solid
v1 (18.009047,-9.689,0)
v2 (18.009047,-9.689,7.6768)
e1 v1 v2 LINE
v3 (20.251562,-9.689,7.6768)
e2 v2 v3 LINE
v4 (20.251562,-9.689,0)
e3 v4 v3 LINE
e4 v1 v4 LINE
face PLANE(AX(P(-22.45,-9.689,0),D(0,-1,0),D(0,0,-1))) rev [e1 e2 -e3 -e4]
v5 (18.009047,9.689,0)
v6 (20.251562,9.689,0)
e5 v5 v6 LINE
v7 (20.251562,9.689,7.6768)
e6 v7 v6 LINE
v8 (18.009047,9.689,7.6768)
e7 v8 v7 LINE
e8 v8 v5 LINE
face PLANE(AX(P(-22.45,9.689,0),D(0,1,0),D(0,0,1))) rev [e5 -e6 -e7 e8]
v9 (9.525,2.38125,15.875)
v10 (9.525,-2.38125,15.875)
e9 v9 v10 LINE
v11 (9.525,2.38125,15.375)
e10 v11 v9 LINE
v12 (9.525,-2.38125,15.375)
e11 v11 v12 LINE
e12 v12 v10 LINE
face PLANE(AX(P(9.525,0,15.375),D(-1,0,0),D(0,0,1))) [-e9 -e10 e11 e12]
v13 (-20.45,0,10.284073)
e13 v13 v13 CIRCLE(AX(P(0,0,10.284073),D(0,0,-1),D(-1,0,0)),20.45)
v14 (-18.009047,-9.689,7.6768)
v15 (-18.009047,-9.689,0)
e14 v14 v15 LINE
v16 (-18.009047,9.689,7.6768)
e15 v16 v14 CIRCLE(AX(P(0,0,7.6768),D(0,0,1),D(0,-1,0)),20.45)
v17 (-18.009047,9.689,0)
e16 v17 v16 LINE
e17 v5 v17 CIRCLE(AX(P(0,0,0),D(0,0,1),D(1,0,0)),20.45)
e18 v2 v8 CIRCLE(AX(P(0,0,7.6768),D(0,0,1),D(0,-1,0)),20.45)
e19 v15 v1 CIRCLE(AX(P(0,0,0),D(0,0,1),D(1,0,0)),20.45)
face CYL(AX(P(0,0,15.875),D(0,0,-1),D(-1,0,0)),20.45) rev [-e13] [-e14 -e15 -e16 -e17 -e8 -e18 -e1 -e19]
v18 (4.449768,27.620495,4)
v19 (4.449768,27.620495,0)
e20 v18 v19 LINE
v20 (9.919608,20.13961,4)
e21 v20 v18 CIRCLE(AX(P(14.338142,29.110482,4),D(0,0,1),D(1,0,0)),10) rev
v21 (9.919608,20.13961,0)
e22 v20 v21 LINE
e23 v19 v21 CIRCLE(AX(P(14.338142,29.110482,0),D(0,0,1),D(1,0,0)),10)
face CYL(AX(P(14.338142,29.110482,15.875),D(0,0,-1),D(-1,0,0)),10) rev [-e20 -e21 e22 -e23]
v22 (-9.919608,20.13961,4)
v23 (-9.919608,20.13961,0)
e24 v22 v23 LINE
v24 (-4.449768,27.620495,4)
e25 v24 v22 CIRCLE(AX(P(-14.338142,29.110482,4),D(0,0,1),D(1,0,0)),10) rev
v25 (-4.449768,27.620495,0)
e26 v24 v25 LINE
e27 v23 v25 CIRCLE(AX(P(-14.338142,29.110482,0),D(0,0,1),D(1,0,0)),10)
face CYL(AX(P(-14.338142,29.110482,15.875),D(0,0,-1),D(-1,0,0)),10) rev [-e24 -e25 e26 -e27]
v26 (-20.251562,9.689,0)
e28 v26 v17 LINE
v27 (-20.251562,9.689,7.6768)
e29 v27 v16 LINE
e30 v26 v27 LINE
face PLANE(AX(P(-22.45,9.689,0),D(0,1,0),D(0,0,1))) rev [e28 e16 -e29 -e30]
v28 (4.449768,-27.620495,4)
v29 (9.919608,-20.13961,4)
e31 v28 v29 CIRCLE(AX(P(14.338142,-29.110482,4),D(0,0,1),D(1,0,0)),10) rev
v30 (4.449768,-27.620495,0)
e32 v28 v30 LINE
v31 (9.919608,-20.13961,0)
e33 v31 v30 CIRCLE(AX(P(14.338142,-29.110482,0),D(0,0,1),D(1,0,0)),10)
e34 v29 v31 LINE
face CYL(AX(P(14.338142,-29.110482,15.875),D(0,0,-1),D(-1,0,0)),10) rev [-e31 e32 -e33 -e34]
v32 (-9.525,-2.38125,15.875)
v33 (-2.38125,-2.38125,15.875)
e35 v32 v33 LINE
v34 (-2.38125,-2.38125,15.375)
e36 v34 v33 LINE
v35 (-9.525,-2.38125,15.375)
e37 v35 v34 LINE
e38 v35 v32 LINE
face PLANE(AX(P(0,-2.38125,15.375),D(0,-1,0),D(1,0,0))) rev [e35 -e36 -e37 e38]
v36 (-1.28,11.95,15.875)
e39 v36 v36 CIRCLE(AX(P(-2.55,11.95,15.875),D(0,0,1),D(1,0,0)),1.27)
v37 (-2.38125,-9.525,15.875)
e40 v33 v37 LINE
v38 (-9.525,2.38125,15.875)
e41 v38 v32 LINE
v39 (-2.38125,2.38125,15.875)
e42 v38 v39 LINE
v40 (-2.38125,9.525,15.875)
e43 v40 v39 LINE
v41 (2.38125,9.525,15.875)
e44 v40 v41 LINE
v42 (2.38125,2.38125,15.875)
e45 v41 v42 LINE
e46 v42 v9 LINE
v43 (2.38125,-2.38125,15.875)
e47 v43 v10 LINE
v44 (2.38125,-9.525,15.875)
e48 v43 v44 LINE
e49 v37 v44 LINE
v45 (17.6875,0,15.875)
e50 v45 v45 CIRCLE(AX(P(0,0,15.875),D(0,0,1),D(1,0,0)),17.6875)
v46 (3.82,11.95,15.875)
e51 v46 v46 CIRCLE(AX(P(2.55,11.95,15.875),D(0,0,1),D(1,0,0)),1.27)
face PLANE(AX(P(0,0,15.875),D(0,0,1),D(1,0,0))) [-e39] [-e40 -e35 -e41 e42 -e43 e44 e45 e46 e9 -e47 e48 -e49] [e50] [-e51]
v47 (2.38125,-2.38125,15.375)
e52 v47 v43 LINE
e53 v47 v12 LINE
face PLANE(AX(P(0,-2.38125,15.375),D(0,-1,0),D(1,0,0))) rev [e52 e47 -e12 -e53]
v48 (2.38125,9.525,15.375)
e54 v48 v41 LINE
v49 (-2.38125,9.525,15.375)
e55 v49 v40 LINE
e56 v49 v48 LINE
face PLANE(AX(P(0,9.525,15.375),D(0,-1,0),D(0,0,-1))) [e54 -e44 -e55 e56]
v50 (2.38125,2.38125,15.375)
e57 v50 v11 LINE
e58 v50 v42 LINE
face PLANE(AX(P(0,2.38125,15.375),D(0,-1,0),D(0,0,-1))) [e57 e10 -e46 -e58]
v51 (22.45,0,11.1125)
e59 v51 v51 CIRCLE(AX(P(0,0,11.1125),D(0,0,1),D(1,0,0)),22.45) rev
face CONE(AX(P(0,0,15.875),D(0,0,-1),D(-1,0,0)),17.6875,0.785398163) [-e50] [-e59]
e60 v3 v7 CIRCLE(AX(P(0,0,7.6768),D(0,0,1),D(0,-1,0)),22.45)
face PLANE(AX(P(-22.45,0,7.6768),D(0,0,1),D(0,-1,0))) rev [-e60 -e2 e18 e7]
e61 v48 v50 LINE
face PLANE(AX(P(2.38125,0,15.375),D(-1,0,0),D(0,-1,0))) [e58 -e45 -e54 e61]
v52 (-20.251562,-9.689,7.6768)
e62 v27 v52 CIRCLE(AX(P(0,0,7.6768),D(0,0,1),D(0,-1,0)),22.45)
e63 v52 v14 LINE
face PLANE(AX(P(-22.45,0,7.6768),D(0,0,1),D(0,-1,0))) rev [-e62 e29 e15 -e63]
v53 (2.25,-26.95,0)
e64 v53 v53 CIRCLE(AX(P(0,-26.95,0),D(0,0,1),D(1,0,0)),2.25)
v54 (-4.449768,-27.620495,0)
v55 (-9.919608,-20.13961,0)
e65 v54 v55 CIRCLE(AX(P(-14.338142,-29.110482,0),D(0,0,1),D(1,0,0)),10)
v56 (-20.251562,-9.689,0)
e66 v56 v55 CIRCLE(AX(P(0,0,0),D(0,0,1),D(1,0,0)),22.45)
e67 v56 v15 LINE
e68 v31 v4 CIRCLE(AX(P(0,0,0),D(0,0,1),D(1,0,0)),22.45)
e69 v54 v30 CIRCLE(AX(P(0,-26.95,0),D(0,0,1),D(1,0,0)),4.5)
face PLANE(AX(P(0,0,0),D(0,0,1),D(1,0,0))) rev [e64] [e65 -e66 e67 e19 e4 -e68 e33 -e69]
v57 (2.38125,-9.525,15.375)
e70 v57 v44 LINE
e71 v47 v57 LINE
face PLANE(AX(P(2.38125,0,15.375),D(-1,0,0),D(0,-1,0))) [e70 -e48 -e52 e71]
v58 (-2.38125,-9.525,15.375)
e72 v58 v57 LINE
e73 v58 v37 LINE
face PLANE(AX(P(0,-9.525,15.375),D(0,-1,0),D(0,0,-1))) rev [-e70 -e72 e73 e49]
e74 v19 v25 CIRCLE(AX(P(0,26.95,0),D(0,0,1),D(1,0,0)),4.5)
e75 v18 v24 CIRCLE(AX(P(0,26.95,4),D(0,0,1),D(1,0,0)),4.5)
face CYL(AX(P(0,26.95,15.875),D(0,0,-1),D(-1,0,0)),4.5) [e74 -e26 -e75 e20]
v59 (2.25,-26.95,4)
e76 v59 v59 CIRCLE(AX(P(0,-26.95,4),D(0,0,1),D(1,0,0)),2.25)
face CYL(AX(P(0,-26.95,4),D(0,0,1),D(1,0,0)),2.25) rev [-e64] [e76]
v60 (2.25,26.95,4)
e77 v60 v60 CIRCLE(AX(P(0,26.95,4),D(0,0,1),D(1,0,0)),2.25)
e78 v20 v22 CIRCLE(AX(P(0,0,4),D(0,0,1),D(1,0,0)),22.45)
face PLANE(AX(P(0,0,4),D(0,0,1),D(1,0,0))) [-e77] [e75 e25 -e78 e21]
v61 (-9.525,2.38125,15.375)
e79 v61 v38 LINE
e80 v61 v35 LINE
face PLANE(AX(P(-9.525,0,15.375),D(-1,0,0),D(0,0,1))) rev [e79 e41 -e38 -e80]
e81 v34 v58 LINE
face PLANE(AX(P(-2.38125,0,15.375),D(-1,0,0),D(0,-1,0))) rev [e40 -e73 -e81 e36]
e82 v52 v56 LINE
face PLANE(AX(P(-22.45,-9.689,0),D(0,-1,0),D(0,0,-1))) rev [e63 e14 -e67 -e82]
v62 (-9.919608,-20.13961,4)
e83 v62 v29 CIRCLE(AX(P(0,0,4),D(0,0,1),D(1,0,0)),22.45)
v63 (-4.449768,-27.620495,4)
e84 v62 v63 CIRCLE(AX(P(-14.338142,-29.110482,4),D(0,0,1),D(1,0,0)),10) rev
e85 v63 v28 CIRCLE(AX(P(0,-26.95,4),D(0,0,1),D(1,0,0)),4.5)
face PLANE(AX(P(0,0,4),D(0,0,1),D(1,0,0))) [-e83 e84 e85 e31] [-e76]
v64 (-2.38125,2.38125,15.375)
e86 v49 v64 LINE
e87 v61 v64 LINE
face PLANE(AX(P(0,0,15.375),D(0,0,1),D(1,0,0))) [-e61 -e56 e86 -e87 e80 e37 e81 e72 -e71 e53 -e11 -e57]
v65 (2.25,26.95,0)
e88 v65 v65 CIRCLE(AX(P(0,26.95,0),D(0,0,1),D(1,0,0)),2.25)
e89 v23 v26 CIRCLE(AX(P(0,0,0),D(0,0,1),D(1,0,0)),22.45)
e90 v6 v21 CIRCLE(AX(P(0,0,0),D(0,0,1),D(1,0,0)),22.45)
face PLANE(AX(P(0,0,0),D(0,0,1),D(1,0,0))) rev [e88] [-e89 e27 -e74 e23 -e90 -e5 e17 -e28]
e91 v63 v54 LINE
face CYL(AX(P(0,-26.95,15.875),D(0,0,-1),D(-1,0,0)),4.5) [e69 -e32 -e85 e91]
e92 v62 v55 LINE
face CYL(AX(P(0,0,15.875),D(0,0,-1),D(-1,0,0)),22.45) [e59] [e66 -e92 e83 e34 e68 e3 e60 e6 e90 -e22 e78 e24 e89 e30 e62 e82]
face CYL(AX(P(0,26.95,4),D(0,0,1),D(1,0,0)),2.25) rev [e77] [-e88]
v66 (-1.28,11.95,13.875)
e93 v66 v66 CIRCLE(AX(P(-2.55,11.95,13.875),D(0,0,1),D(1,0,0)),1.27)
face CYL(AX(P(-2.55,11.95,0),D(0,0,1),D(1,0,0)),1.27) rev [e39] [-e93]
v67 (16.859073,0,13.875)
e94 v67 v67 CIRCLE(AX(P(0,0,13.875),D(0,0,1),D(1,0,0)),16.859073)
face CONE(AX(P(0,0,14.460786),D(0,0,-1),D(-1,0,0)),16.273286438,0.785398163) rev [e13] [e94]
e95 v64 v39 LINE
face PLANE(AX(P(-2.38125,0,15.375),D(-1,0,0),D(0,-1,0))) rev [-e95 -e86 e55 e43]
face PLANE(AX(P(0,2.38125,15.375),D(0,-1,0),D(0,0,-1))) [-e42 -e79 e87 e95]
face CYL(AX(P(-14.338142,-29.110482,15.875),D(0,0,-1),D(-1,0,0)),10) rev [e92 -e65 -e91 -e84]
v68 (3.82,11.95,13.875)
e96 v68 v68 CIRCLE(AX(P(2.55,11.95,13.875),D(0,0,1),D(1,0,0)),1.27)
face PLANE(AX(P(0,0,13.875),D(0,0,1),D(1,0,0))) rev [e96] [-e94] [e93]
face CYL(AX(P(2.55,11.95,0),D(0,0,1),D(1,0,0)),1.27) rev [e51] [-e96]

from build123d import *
from build123d.topology import SkipClean

# Parameters (mm, degrees)
BOSS_EXTRUDE1_DEPTH     = 15.875
CUT_EXTRUDE2_START      = -11.875
CUT_EXTRUDE2_DEPTH      = 11.875
M4_CLEARANCE_HOLE1_D    = 4.5
CHAMFER1_SIZE           = 4.7625
SHELL1_OUTLINE_R        = 20.45
SHELL1_DEPTH            = 10.284072775
SHELL1_2_DEPTH          = 2
BOSS_EXTRUDE2_START     = 2
BOSS_EXTRUDE2_DEPTH     = 2
SKETCH7_W               = 7.14375
SKETCH7_H               = 4.7625
SKETCH7_W_2             = 4.7625
SKETCH7_H_2             = 7.14375
CUT_EXTRUDE5_DEPTH      = 0.5
CUT_EXTRUDE7_DEPTH      = 42.774640932
CUT_EXTRUDE7_DEPTH_BACK = 42.774640932
SKETCH9_W               = 6.175
SKETCH9_H               = 19.378
SKETCH9_W_2             = 3.175
SKETCH9_H_2             = 16.378
SKETCH9_W_3             = 1.5018
SKETCH12_R              = 1.27
CUT_EXTRUDE10_DEPTH     = 42.774640932


with BuildPart() as part:
    # Sketch1 → Boss-Extrude1 (new body)
    with BuildSketch(Plane.XY):
        with BuildLine():
            ThreePointArc((-9.919608253, 20.139609532), (-22.45, 0), (-9.919608253, -20.139609532))
            ThreePointArc((-9.919608253, -20.139609532), (-6.265793461, -23.208178662), (-4.449768206, -27.62049453))
            ThreePointArc((-4.449768206, -27.62049453), (0, -31.45), (4.449768206, -27.62049453))
            ThreePointArc((4.449768206, -27.62049453), (6.265793461, -23.208178662), (9.919608253, -20.139609532))
            ThreePointArc((9.919608253, -20.139609532), (22.45, 0), (9.919608253, 20.139609532))
            ThreePointArc((9.919608253, 20.139609532), (6.265793461, 23.208178662), (4.449768206, 27.62049453))
            ThreePointArc((4.449768206, 27.62049453), (0, 31.45), (-4.449768206, 27.62049453))
            ThreePointArc((-4.449768206, 27.62049453), (-6.265793461, 23.208178662), (-9.919608253, 20.139609532))
        make_face()
    extrude(amount=BOSS_EXTRUDE1_DEPTH)

    # Sketch3 → Cut-Extrude2 (cut)
    with SkipClean():  # the faces are left unmerged after this step: merging them gives an invalid solid
        with BuildSketch(Plane.XY.offset(15.875).offset(CUT_EXTRUDE2_START)):
            with BuildLine():
                ThreePointArc((-4.449768206, 27.62049453), (-6.265793461, 23.208178662), (-9.919608253, 20.139609532))
                ThreePointArc((-9.919608253, 20.139609532), (0, 22.45), (9.919608253, 20.139609532))
                ThreePointArc((9.919608253, 20.139609532), (6.265793461, 23.208178662), (4.449768206, 27.62049453))
                ThreePointArc((4.449768206, 27.62049453), (0, 31.45), (-4.449768206, 27.62049453))
            make_face()
            with BuildLine():
                ThreePointArc((9.919608253, -20.139609532), (0, -22.45), (-9.919608253, -20.139609532))
                ThreePointArc((-9.919608253, -20.139609532), (-6.265793461, -23.208178662), (-4.449768206, -27.62049453))
                ThreePointArc((-4.449768206, -27.62049453), (0, -31.45), (4.449768206, -27.62049453))
                ThreePointArc((4.449768206, -27.62049453), (6.265793461, -23.208178662), (9.919608253, -20.139609532))
            make_face()
        extrude(amount=CUT_EXTRUDE2_DEPTH, mode=Mode.SUBTRACT)

    # M4 Clearance Hole1 (through all)
    with Locations(Plane.XY.offset(4)):
        with Locations((0, -26.95), (0, 26.95)):
            Hole(M4_CLEARANCE_HOLE1_D / 2)

    # Chamfer1
    chamfer1_edges = [part.edges().sort_by_distance(p)[0] for p in [
        (22.45, 0, 15.875),
    ]]
    chamfer(chamfer1_edges, length=CHAMFER1_SIZE)

    # Shell1: read off the stored shape, not the designer's step
    # Shell1 outline → Shell1 (cut)
    with SkipClean():  # the faces are left unmerged after this step: merging them gives an invalid solid
        with BuildSketch(Plane.XY):
            Circle(SHELL1_OUTLINE_R)
        extrude(amount=SHELL1_DEPTH, mode=Mode.SUBTRACT)

    # Shell1 2 outline → Shell1 2 (cut)
    with SkipClean():  # the faces are left unmerged after this step: merging them gives an invalid solid
        with BuildSketch(Plane.XY):
            with BuildLine():
                ThreePointArc((-3.336769132, -24.317800965), (0, -22.7), (3.336769132, -24.317800965))
                ThreePointArc((3.336769132, -24.317800965), (5.656595992, -20.826114024), (9.035901505, -18.345434963))
                ThreePointArc((9.035901505, -18.345434963), (0, -20.45), (-9.035901505, -18.345434963))
                ThreePointArc((-9.035901505, -18.345434963), (-5.656595992, -20.826114024), (-3.336769132, -24.317800965))
            make_face()
            with BuildLine():
                ThreePointArc((-3.336769132, 24.317800965), (-5.656595992, 20.826114024), (-9.035901505, 18.345434963))
                ThreePointArc((-9.035901505, 18.345434963), (0, 20.45), (9.035901505, 18.345434963))
                ThreePointArc((9.035901505, 18.345434963), (5.656595992, 20.826114024), (3.336769132, 24.317800965))
                ThreePointArc((3.336769132, 24.317800965), (0, 22.7), (-3.336769132, 24.317800965))
            make_face()
        extrude(amount=SHELL1_2_DEPTH, mode=Mode.SUBTRACT)

    # Shell1 3 outline → Shell1 3 (revolve, cut)
    with SkipClean():  # the faces are left unmerged after this step: merging them gives an invalid solid
        with BuildSketch(Plane.XZ):
            Polygon((16.859072875, 13.875), (0, 13.875), (0, 10.284072775), (20.45, 10.284072775), align=None)
        revolve(axis=Axis((0, 0, 0), (0, 0, 1)), mode=Mode.SUBTRACT)

    # Sketch6 → Boss-Extrude2 (add)
    with SkipClean():  # the faces are left unmerged after this step: merging them gives an invalid solid
        with BuildSketch(Plane(origin=(0, 0, 2), x_dir=(-1, 0, 0), z_dir=(0, 0, -1)).offset(BOSS_EXTRUDE2_START)):
            with BuildLine():
                ThreePointArc((3.336769132, -24.317800965), (0, -22.7), (-3.336769132, -24.317800965))
                ThreePointArc((-3.336769132, -24.317800965), (-5.656595992, -20.826114024), (-9.035901505, -18.345434963))
                ThreePointArc((-9.035901505, -18.345434963), (0, -20.45), (9.035901505, -18.345434963))
                ThreePointArc((9.035901505, -18.345434963), (5.656595992, -20.826114024), (3.336769132, -24.317800965))
            make_face()
            with BuildLine():
                ThreePointArc((-9.035901505, 18.345434963), (-5.656595992, 20.826114024), (-3.336769132, 24.317800965))
                ThreePointArc((-3.336769132, 24.317800965), (0, 22.7), (3.336769132, 24.317800965))
                ThreePointArc((3.336769132, 24.317800965), (5.656595992, 20.826114024), (9.035901505, 18.345434963))
                ThreePointArc((9.035901505, 18.345434963), (0, 20.45), (-9.035901505, 18.345434963))
            make_face()
        extrude(amount=-BOSS_EXTRUDE2_DEPTH)

    # Sketch7 → Cut-Extrude5 (cut)
    with SkipClean():  # the faces are left unmerged after this step: merging them gives an invalid solid
        with BuildSketch(Plane.XY.offset(15.875)):
            with Locations((-5.953125, 0)):
                Rectangle(SKETCH7_W, SKETCH7_H)
            Rectangle(SKETCH7_W_2, SKETCH7_H)
            with Locations((5.953125, 0)):
                Rectangle(SKETCH7_W, SKETCH7_H)
            with Locations((0, -5.953125)):
                Rectangle(SKETCH7_W_2, SKETCH7_H_2)
            with Locations((0, 5.953125)):
                Rectangle(SKETCH7_W_2, SKETCH7_H_2)
        extrude(amount=-CUT_EXTRUDE5_DEPTH, mode=Mode.SUBTRACT)

    # Sketch9 → Cut-Extrude7 (cut, two sides: drawn at the far end of the back side and taken through both)
    # profile 1 of 3: a face of its own
    with SkipClean():  # the faces are left unmerged after this step: merging them gives an invalid solid
        with BuildSketch(Plane(origin=(0, 0, 0), x_dir=(0, 0, -1), z_dir=(1, 0, 0)).offset(-CUT_EXTRUDE7_DEPTH_BACK)):
            with Locations((-4.5893, 0)):
                Rectangle(SKETCH9_W, SKETCH9_H)
            with Locations((-4.5893, 0)):
                Rectangle(SKETCH9_W_2, SKETCH9_H_2, mode=Mode.SUBTRACT)
        # profile 2 of 3: a face of its own
        with BuildSketch(Plane(origin=(0, 0, 0), x_dir=(0, 0, -1), z_dir=(1, 0, 0)).offset(-CUT_EXTRUDE7_DEPTH_BACK)):
            with Locations((-0.7509, 0)):
                Rectangle(SKETCH9_W_3, SKETCH9_H)
        # profile 3 of 3: a face of its own
        with BuildSketch(Plane(origin=(0, 0, 0), x_dir=(0, 0, -1), z_dir=(1, 0, 0)).offset(-CUT_EXTRUDE7_DEPTH_BACK)):
            with Locations((-4.5893, 0)):
                Rectangle(SKETCH9_W_2, SKETCH9_H_2)
        extrude(amount=CUT_EXTRUDE7_DEPTH + CUT_EXTRUDE7_DEPTH_BACK, mode=Mode.SUBTRACT)

    # Sketch12 → Cut-Extrude10 (cut, through all)
    with SkipClean():  # the faces are left unmerged after this step: merging them gives an invalid solid
        with BuildSketch(Plane.XY.offset(15.875)):
            with Locations((-2.55, 11.95)):
                Circle(SKETCH12_R)
            with Locations((2.55, 11.95)):
                Circle(SKETCH12_R)
        extrude(amount=-CUT_EXTRUDE10_DEPTH, mode=Mode.SUBTRACT)


solid = part.part
